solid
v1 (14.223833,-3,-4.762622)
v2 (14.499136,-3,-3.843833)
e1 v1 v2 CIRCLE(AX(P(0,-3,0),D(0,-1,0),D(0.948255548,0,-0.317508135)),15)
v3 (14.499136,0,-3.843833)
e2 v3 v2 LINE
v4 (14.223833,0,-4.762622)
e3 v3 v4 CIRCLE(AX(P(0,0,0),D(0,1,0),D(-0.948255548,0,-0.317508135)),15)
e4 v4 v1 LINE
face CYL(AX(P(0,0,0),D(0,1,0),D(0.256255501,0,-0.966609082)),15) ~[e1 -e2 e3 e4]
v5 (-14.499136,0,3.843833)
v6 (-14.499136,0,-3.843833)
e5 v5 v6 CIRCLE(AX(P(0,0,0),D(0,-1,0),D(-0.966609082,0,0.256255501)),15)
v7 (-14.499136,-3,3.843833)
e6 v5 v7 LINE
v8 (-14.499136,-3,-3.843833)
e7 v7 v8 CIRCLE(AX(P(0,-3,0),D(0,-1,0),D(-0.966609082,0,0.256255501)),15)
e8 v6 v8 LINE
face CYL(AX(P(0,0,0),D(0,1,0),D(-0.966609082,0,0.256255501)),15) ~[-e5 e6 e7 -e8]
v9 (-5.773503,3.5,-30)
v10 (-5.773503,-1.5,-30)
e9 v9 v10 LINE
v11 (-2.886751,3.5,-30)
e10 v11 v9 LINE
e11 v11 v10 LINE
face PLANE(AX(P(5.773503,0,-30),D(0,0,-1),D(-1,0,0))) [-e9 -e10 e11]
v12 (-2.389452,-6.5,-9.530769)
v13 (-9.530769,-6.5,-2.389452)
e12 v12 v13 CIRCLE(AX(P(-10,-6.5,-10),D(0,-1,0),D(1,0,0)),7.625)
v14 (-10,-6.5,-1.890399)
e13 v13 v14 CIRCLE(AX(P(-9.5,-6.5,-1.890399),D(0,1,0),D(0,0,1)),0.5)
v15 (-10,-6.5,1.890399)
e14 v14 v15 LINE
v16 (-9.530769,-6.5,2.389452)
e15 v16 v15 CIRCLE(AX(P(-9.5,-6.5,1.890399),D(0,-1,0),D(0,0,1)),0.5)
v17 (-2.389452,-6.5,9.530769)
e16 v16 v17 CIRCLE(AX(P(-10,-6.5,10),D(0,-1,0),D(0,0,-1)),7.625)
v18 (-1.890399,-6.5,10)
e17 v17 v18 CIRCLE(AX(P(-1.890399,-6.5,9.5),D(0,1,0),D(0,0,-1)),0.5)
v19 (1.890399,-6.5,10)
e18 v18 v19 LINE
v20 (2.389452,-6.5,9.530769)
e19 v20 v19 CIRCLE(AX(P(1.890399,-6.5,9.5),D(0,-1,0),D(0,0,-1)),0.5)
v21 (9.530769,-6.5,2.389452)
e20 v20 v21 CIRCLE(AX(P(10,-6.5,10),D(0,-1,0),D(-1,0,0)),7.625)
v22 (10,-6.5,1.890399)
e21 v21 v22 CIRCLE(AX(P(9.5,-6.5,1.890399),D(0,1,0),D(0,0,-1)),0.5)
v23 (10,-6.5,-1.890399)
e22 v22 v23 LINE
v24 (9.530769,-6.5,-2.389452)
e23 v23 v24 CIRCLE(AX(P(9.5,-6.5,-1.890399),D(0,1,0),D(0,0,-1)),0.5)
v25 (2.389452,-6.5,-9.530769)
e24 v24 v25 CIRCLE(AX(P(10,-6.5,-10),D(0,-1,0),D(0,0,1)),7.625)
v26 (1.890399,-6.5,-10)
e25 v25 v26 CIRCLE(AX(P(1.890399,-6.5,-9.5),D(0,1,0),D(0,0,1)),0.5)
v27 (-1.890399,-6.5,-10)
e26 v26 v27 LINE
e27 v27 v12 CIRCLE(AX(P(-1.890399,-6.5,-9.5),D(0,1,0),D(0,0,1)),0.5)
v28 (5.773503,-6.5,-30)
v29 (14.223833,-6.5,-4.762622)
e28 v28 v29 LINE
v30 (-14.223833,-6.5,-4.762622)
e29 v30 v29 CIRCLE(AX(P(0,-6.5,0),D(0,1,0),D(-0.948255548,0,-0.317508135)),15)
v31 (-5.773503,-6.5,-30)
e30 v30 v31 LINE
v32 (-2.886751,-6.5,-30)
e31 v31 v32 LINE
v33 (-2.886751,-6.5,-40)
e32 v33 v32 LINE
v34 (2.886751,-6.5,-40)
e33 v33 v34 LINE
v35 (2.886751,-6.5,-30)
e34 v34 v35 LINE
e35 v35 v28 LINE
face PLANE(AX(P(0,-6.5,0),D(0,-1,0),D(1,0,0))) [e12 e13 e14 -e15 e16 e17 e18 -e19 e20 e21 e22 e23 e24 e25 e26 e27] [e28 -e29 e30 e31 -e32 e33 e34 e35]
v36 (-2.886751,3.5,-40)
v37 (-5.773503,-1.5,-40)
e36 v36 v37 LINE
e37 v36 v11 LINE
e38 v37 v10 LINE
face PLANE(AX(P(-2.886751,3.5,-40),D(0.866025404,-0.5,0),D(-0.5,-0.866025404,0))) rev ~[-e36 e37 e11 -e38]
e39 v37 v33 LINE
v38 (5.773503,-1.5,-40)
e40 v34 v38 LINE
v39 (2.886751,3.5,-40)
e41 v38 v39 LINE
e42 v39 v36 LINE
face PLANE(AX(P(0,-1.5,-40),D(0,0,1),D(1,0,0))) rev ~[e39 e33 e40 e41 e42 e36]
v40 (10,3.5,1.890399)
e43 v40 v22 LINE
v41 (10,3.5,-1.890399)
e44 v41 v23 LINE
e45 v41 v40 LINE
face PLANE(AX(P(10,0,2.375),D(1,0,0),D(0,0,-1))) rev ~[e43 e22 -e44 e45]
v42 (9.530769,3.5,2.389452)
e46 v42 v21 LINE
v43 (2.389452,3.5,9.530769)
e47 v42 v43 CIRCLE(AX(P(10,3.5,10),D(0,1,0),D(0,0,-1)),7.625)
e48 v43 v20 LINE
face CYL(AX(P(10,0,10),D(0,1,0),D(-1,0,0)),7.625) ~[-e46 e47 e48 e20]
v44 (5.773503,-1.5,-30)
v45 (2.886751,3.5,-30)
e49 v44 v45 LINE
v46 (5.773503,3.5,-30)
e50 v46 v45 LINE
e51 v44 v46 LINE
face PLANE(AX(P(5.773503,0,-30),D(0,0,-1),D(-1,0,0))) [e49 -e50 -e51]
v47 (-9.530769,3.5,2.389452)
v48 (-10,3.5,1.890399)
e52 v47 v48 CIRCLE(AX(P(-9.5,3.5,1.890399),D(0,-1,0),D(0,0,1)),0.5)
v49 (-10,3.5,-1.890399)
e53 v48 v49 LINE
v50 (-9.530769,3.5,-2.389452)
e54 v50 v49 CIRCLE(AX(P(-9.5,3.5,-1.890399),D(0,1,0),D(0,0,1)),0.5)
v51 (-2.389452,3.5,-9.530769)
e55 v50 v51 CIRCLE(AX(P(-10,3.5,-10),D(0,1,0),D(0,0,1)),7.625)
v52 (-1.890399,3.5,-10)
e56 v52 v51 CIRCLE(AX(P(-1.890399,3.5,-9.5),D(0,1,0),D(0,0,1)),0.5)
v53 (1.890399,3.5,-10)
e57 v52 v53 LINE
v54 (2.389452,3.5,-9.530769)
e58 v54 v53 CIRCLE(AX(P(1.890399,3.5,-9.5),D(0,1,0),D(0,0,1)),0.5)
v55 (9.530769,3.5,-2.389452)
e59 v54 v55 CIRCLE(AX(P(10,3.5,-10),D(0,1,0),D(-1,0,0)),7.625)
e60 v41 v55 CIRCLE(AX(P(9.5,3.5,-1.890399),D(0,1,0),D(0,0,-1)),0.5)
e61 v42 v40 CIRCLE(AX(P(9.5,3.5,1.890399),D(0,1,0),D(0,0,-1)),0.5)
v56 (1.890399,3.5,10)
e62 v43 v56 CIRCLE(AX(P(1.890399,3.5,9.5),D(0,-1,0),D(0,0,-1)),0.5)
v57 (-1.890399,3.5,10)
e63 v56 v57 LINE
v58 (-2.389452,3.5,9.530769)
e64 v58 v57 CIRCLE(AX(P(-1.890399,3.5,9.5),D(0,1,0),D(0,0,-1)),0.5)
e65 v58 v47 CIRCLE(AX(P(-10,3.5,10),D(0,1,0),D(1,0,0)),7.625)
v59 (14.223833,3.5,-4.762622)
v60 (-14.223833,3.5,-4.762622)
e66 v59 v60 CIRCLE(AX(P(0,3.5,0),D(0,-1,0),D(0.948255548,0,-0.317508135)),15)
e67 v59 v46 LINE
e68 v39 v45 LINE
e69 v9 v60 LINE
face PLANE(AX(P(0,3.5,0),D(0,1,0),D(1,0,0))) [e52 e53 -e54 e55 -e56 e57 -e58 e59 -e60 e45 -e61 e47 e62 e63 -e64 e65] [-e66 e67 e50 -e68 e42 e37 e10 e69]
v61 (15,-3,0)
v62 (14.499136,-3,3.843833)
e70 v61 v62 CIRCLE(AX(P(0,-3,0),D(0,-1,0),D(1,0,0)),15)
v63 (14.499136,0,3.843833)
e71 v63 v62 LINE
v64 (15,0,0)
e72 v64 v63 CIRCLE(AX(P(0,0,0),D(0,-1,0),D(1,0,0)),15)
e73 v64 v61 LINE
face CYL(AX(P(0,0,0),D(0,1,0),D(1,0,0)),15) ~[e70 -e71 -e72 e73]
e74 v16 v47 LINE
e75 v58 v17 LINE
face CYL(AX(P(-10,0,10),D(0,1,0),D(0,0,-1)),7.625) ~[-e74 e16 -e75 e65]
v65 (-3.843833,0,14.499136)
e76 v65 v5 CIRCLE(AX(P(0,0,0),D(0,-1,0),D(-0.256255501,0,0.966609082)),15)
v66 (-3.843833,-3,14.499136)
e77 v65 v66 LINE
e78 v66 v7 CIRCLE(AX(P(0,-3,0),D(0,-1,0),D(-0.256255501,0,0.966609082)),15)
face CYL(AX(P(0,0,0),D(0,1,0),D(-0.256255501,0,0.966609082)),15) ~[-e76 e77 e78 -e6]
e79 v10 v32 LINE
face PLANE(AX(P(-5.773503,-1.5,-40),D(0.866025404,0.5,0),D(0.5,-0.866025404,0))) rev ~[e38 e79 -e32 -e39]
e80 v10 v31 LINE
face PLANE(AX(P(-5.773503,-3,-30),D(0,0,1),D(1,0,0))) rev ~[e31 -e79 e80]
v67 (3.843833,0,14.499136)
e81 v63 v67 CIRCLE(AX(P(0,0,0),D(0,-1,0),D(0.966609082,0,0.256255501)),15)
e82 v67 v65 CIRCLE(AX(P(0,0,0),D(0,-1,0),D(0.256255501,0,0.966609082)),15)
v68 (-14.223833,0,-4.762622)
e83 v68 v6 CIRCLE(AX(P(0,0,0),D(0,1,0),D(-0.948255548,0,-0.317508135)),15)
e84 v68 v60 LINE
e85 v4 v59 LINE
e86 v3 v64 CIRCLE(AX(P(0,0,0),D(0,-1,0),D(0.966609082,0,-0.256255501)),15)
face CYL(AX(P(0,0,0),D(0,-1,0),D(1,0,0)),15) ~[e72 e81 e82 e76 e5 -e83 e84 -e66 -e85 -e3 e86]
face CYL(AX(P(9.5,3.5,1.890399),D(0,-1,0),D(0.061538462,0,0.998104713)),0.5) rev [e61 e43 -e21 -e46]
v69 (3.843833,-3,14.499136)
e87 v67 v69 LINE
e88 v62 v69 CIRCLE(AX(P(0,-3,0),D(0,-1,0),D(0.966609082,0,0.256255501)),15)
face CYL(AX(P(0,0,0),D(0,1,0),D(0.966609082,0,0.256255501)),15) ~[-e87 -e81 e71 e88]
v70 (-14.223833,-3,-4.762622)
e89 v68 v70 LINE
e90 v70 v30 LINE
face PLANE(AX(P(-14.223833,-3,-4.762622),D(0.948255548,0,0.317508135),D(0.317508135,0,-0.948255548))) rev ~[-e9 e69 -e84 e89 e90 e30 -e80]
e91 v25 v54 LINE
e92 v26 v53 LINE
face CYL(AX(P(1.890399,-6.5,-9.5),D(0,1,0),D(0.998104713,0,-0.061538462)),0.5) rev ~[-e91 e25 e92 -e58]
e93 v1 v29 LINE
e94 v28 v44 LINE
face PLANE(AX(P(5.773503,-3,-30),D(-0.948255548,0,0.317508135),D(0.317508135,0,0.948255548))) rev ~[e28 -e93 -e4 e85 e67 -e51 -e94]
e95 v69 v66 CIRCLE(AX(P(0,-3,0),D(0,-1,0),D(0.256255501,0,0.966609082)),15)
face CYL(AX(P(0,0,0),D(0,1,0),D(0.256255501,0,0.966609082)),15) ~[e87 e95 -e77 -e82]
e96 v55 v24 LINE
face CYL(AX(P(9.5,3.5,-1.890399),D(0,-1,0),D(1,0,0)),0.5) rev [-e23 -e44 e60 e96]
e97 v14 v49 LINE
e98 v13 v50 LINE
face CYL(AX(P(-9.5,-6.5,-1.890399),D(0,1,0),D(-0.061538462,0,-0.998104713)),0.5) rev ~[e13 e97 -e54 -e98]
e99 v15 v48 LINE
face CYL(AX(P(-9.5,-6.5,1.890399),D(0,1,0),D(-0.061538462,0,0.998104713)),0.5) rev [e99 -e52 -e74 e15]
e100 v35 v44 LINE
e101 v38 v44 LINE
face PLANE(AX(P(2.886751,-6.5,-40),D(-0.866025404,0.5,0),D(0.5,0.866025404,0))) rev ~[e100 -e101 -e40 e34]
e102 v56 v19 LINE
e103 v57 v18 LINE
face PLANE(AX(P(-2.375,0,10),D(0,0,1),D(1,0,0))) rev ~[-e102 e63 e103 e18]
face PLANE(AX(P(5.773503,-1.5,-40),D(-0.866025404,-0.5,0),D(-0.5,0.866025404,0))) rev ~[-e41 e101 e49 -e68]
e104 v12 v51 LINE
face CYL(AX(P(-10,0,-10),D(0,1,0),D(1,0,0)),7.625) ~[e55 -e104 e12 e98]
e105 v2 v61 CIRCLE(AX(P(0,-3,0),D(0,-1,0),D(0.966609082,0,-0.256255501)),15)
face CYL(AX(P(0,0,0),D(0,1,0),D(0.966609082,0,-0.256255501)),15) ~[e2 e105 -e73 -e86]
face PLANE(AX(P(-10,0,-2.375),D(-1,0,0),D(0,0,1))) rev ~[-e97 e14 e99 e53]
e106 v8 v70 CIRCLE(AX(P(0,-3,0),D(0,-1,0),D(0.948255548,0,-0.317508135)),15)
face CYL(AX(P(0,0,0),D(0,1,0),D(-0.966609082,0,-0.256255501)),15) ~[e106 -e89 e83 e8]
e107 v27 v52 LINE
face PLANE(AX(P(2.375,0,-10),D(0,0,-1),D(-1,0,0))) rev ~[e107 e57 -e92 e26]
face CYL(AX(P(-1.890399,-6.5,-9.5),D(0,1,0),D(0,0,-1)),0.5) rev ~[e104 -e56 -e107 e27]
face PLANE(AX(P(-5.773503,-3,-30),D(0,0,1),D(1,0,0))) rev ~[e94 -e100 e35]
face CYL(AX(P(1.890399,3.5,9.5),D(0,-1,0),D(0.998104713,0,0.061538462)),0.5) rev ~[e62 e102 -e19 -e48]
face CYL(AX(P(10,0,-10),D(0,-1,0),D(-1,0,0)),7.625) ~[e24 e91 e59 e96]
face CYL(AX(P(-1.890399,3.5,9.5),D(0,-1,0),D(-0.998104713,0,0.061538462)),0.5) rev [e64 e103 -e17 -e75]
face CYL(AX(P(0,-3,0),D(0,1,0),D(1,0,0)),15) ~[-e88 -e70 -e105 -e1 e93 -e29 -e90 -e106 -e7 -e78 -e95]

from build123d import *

# Parameters (mm, degrees)
F1_DEPTH   = 3
F5_DEPTH   = 10
F7_DEPTH   = 3
F1_FACE1_R = 15
F8_DEPTH   = 3.5
F1_FACE_R  = 15
F9_DEPTH   = 3.5
F11_R      = 0.5


with BuildPart() as f1:
    # F0 (on Front) → F1 (new body)
    with BuildSketch(Plane.XZ):
        with BuildLine():
            Line((-10, -2.375), (-10, 2.375))
            ThreePointArc((-10, 2.375), (-12.3664158462, 2.7515035323), (-14.4991362367, 3.8438325133))
            ThreePointArc((-14.4991362367, 3.8438325133), (-15, 0), (-14.4991362367, -3.8438325133))
            ThreePointArc((-14.4991362367, -3.8438325133), (-12.3664158462, -2.7515035323), (-10, -2.375))
        make_face()
        with BuildLine():
            Line((-10, 10), (-2.375, 10))
            ThreePointArc((-2.375, 10), (-2.7515035323, 12.3664158462), (-3.8438325133, 14.4991362367))
            ThreePointArc((-3.8438325133, 14.4991362367), (-10.6066017178, 10.6066017178), (-14.4991362367, 3.8438325133))
            ThreePointArc((-14.4991362367, 3.8438325133), (-12.3664158462, 2.7515035323), (-10, 2.375))
            Line((-10, 2.375), (-10, 10))
        make_face()
        with BuildLine():
            ThreePointArc((-10, 2.375), (-4.6083107935, 4.6083107935), (-2.375, 10))
            Line((-2.375, 10), (-10, 10))
            Line((-10, 10), (-10, 2.375))
        make_face()
        with BuildLine():
            Line((-2.375, 10), (2.375, 10))
            ThreePointArc((2.375, 10), (2.7515035323, 12.3664158462), (3.8438325133, 14.4991362367))
            ThreePointArc((3.8438325133, 14.4991362367), (0, 15), (-3.8438325133, 14.4991362367))
            ThreePointArc((-3.8438325133, 14.4991362367), (-2.7515035323, 12.3664158462), (-2.375, 10))
        make_face()
        with BuildLine():
            Line((2.375, 10), (10, 10))
            Line((10, 10), (10, 2.375))
            ThreePointArc((10, 2.375), (12.3664158462, 2.7515035323), (14.4991362367, 3.8438325133))
            ThreePointArc((14.4991362367, 3.8438325133), (10.6066017178, 10.6066017178), (3.8438325133, 14.4991362367))
            ThreePointArc((3.8438325133, 14.4991362367), (2.7515035323, 12.3664158462), (2.375, 10))
        make_face()
        with BuildLine():
            ThreePointArc((14.4991362367, 3.8438325133), (12.3664158462, 2.7515035323), (10, 2.375))
            Line((10, 2.375), (10, -2.375))
            ThreePointArc((10, -2.375), (12.3664158462, -2.7515035323), (14.4991362367, -3.8438325133))
            ThreePointArc((14.4991362367, -3.8438325133), (14.8742570159, -1.9381636218), (15, 0))
            ThreePointArc((15, 0), (14.8742570159, 1.9381636218), (14.4991362367, 3.8438325133))
        make_face()
        with BuildLine():
            ThreePointArc((14.4991362367, -3.8438325133), (12.3664158462, -2.7515035323), (10, -2.375))
            Line((10, -2.375), (10, -10))
            Line((10, -10), (2.375, -10))
            ThreePointArc((2.375, -10), (2.7515035323, -12.3664158462), (3.8438325133, -14.4991362367))
            ThreePointArc((3.8438325133, -14.4991362367), (10.6066017178, -10.6066017178), (14.4991362367, -3.8438325133))
        make_face()
        with BuildLine():
            ThreePointArc((3.8438325133, -14.4991362367), (2.7515035323, -12.3664158462), (2.375, -10))
            Line((2.375, -10), (-2.375, -10))
            ThreePointArc((-2.375, -10), (-2.7515035323, -12.3664158462), (-3.8438325133, -14.4991362367))
            ThreePointArc((-3.8438325133, -14.4991362367), (0, -15), (3.8438325133, -14.4991362367))
        make_face()
        with BuildLine():
            Line((-10, -10), (-10, -2.375))
            ThreePointArc((-10, -2.375), (-12.3664158462, -2.7515035323), (-14.4991362367, -3.8438325133))
            ThreePointArc((-14.4991362367, -3.8438325133), (-10.6066017178, -10.6066017178), (-3.8438325133, -14.4991362367))
            ThreePointArc((-3.8438325133, -14.4991362367), (-2.7515035323, -12.3664158462), (-2.375, -10))
            Line((-2.375, -10), (-10, -10))
        make_face()
        with BuildLine():
            ThreePointArc((-2.375, -10), (-4.6083107935, -4.6083107935), (-10, -2.375))
            Line((-10, -2.375), (-10, -10))
            Line((-10, -10), (-2.375, -10))
        make_face()
        with BuildLine():
            Line((10, -10), (10, -2.375))
            ThreePointArc((10, -2.375), (4.6083107935, -4.6083107935), (2.375, -10))
            Line((2.375, -10), (10, -10))
        make_face()
        with BuildLine():
            Line((10, 2.375), (10, 10))
            Line((10, 10), (2.375, 10))
            ThreePointArc((2.375, 10), (4.6083107935, 4.6083107935), (10, 2.375))
        make_face()
    extrude(amount=F1_DEPTH)


with BuildPart() as f5:
    # F4 (on offset) → F5 (new body)
    with BuildSketch(Plane.XY.offset(-40)):
        Polygon((2.8867513459, 3.5), (-2.8867513459, 3.5), (-5.7735026919, -1.5), (-2.8867513459, -6.5), (2.8867513459, -6.5), (5.7735026919, -1.5), align=None)
    extrude(amount=F5_DEPTH)


with BuildPart() as f7:
    # F6 (on face) → F7 (new body, through all)
    with BuildSketch(Plane(origin=(0, 0, 0), x_dir=(-1, 0, 0), z_dir=(0, 1, 0))):
        with BuildLine():
            ThreePointArc((14.2238332207, -4.7626220204), (0, -15), (-14.2238332207, -4.7626220204))
            Line((-14.2238332207, -4.7626220204), (-5.7735026919, -30))
            Line((-5.7735026919, -30), (5.7735026919, -30))
            Line((5.7735026919, -30), (14.2238332207, -4.7626220204))
        make_face()
    extrude(amount=-F7_DEPTH)


with BuildPart() as f8:
    # F7_face (on face) + F1_face1 (on face) → F8 (new body, through all)
    with BuildSketch(Plane(origin=(0, 0, -20.4204827201), x_dir=(-1, 0, 0), z_dir=(0, 1, 0))):
        with BuildLine():
            ThreePointArc((14.2238332207, 15.6578606997), (0, 5.4204827201), (-14.2238332207, 15.6578606997))
            Line((-14.2238332207, 15.6578606997), (-5.7735026919, -9.5795172799))
            Line((-5.7735026919, -9.5795172799), (5.7735026919, -9.5795172799))
            Line((5.7735026919, -9.5795172799), (14.2238332207, 15.6578606997))
        make_face()
    with BuildSketch(Plane(origin=(0, 0, 0), x_dir=(1, 0, 0), z_dir=(0, 1, 0))):
        Circle(F1_FACE1_R)
        with BuildLine():
            ThreePointArc((-2.375, -10), (-4.6083107935, -4.6083107935), (-10, -2.375))
            Line((-10, -2.375), (-10, 2.375))
            ThreePointArc((-10, 2.375), (-4.6083107935, 4.6083107935), (-2.375, 10))
            Line((-2.375, 10), (2.375, 10))
            ThreePointArc((2.375, 10), (4.6083107935, 4.6083107935), (10, 2.375))
            Line((10, 2.375), (10, -2.375))
            ThreePointArc((10, -2.375), (4.6083107935, -4.6083107935), (2.375, -10))
            Line((2.375, -10), (-2.375, -10))
        make_face(mode=Mode.SUBTRACT)
    extrude(amount=F8_DEPTH)


with BuildPart() as f9:
    # F1_face (on face) + F7_face1 (on face) → F9 (new body, through all)
    with BuildSketch(Plane.XZ.offset(3)):
        Circle(F1_FACE_R)
        with BuildLine():
            ThreePointArc((-10, 2.375), (-4.6083107935, 4.6083107935), (-2.375, 10))
            Line((-2.375, 10), (2.375, 10))
            ThreePointArc((2.375, 10), (4.6083107935, 4.6083107935), (10, 2.375))
            Line((10, 2.375), (10, -2.375))
            ThreePointArc((10, -2.375), (4.6083107935, -4.6083107935), (2.375, -10))
            Line((2.375, -10), (-2.375, -10))
            ThreePointArc((-2.375, -10), (-4.6083107935, -4.6083107935), (-10, -2.375))
            Line((-10, -2.375), (-10, 2.375))
        make_face(mode=Mode.SUBTRACT)
    with BuildSketch(Plane(origin=(0, -3, -20.4204827201), x_dir=(-1, 0, 0), z_dir=(0, -1, 0))):
        with BuildLine():
            ThreePointArc((-14.2238332207, -15.6578606997), (0, -5.4204827201), (14.2238332207, -15.6578606997))
            Line((14.2238332207, -15.6578606997), (5.7735026919, 9.5795172799))
            Line((5.7735026919, 9.5795172799), (-5.7735026919, 9.5795172799))
            Line((-5.7735026919, 9.5795172799), (-14.2238332207, -15.6578606997))
        make_face()
    extrude(amount=F9_DEPTH)


with BuildPart() as f5_1:
    add(f5.part)

    # F10: union F8, F7, F9, F1
    add(f8.part)
    add(f7.part)
    add(f9.part)
    add(f1.part)

    # F11
    f11_edges = [f5_1.edges().sort_by_distance(p)[0] for p in [
        (10, -1.5, -2.375),
        (10, -1.5, 2.375),
        (2.375, -1.5, -10),
        (-2.375, -1.5, -10),
        (-10, -1.5, -2.375),
        (-10, -1.5, 2.375),
        (-2.375, -1.5, 10),
        (2.375, -1.5, 10),
    ]]
    fillet(f11_edges, radius=F11_R)


solid = f5_1.part
